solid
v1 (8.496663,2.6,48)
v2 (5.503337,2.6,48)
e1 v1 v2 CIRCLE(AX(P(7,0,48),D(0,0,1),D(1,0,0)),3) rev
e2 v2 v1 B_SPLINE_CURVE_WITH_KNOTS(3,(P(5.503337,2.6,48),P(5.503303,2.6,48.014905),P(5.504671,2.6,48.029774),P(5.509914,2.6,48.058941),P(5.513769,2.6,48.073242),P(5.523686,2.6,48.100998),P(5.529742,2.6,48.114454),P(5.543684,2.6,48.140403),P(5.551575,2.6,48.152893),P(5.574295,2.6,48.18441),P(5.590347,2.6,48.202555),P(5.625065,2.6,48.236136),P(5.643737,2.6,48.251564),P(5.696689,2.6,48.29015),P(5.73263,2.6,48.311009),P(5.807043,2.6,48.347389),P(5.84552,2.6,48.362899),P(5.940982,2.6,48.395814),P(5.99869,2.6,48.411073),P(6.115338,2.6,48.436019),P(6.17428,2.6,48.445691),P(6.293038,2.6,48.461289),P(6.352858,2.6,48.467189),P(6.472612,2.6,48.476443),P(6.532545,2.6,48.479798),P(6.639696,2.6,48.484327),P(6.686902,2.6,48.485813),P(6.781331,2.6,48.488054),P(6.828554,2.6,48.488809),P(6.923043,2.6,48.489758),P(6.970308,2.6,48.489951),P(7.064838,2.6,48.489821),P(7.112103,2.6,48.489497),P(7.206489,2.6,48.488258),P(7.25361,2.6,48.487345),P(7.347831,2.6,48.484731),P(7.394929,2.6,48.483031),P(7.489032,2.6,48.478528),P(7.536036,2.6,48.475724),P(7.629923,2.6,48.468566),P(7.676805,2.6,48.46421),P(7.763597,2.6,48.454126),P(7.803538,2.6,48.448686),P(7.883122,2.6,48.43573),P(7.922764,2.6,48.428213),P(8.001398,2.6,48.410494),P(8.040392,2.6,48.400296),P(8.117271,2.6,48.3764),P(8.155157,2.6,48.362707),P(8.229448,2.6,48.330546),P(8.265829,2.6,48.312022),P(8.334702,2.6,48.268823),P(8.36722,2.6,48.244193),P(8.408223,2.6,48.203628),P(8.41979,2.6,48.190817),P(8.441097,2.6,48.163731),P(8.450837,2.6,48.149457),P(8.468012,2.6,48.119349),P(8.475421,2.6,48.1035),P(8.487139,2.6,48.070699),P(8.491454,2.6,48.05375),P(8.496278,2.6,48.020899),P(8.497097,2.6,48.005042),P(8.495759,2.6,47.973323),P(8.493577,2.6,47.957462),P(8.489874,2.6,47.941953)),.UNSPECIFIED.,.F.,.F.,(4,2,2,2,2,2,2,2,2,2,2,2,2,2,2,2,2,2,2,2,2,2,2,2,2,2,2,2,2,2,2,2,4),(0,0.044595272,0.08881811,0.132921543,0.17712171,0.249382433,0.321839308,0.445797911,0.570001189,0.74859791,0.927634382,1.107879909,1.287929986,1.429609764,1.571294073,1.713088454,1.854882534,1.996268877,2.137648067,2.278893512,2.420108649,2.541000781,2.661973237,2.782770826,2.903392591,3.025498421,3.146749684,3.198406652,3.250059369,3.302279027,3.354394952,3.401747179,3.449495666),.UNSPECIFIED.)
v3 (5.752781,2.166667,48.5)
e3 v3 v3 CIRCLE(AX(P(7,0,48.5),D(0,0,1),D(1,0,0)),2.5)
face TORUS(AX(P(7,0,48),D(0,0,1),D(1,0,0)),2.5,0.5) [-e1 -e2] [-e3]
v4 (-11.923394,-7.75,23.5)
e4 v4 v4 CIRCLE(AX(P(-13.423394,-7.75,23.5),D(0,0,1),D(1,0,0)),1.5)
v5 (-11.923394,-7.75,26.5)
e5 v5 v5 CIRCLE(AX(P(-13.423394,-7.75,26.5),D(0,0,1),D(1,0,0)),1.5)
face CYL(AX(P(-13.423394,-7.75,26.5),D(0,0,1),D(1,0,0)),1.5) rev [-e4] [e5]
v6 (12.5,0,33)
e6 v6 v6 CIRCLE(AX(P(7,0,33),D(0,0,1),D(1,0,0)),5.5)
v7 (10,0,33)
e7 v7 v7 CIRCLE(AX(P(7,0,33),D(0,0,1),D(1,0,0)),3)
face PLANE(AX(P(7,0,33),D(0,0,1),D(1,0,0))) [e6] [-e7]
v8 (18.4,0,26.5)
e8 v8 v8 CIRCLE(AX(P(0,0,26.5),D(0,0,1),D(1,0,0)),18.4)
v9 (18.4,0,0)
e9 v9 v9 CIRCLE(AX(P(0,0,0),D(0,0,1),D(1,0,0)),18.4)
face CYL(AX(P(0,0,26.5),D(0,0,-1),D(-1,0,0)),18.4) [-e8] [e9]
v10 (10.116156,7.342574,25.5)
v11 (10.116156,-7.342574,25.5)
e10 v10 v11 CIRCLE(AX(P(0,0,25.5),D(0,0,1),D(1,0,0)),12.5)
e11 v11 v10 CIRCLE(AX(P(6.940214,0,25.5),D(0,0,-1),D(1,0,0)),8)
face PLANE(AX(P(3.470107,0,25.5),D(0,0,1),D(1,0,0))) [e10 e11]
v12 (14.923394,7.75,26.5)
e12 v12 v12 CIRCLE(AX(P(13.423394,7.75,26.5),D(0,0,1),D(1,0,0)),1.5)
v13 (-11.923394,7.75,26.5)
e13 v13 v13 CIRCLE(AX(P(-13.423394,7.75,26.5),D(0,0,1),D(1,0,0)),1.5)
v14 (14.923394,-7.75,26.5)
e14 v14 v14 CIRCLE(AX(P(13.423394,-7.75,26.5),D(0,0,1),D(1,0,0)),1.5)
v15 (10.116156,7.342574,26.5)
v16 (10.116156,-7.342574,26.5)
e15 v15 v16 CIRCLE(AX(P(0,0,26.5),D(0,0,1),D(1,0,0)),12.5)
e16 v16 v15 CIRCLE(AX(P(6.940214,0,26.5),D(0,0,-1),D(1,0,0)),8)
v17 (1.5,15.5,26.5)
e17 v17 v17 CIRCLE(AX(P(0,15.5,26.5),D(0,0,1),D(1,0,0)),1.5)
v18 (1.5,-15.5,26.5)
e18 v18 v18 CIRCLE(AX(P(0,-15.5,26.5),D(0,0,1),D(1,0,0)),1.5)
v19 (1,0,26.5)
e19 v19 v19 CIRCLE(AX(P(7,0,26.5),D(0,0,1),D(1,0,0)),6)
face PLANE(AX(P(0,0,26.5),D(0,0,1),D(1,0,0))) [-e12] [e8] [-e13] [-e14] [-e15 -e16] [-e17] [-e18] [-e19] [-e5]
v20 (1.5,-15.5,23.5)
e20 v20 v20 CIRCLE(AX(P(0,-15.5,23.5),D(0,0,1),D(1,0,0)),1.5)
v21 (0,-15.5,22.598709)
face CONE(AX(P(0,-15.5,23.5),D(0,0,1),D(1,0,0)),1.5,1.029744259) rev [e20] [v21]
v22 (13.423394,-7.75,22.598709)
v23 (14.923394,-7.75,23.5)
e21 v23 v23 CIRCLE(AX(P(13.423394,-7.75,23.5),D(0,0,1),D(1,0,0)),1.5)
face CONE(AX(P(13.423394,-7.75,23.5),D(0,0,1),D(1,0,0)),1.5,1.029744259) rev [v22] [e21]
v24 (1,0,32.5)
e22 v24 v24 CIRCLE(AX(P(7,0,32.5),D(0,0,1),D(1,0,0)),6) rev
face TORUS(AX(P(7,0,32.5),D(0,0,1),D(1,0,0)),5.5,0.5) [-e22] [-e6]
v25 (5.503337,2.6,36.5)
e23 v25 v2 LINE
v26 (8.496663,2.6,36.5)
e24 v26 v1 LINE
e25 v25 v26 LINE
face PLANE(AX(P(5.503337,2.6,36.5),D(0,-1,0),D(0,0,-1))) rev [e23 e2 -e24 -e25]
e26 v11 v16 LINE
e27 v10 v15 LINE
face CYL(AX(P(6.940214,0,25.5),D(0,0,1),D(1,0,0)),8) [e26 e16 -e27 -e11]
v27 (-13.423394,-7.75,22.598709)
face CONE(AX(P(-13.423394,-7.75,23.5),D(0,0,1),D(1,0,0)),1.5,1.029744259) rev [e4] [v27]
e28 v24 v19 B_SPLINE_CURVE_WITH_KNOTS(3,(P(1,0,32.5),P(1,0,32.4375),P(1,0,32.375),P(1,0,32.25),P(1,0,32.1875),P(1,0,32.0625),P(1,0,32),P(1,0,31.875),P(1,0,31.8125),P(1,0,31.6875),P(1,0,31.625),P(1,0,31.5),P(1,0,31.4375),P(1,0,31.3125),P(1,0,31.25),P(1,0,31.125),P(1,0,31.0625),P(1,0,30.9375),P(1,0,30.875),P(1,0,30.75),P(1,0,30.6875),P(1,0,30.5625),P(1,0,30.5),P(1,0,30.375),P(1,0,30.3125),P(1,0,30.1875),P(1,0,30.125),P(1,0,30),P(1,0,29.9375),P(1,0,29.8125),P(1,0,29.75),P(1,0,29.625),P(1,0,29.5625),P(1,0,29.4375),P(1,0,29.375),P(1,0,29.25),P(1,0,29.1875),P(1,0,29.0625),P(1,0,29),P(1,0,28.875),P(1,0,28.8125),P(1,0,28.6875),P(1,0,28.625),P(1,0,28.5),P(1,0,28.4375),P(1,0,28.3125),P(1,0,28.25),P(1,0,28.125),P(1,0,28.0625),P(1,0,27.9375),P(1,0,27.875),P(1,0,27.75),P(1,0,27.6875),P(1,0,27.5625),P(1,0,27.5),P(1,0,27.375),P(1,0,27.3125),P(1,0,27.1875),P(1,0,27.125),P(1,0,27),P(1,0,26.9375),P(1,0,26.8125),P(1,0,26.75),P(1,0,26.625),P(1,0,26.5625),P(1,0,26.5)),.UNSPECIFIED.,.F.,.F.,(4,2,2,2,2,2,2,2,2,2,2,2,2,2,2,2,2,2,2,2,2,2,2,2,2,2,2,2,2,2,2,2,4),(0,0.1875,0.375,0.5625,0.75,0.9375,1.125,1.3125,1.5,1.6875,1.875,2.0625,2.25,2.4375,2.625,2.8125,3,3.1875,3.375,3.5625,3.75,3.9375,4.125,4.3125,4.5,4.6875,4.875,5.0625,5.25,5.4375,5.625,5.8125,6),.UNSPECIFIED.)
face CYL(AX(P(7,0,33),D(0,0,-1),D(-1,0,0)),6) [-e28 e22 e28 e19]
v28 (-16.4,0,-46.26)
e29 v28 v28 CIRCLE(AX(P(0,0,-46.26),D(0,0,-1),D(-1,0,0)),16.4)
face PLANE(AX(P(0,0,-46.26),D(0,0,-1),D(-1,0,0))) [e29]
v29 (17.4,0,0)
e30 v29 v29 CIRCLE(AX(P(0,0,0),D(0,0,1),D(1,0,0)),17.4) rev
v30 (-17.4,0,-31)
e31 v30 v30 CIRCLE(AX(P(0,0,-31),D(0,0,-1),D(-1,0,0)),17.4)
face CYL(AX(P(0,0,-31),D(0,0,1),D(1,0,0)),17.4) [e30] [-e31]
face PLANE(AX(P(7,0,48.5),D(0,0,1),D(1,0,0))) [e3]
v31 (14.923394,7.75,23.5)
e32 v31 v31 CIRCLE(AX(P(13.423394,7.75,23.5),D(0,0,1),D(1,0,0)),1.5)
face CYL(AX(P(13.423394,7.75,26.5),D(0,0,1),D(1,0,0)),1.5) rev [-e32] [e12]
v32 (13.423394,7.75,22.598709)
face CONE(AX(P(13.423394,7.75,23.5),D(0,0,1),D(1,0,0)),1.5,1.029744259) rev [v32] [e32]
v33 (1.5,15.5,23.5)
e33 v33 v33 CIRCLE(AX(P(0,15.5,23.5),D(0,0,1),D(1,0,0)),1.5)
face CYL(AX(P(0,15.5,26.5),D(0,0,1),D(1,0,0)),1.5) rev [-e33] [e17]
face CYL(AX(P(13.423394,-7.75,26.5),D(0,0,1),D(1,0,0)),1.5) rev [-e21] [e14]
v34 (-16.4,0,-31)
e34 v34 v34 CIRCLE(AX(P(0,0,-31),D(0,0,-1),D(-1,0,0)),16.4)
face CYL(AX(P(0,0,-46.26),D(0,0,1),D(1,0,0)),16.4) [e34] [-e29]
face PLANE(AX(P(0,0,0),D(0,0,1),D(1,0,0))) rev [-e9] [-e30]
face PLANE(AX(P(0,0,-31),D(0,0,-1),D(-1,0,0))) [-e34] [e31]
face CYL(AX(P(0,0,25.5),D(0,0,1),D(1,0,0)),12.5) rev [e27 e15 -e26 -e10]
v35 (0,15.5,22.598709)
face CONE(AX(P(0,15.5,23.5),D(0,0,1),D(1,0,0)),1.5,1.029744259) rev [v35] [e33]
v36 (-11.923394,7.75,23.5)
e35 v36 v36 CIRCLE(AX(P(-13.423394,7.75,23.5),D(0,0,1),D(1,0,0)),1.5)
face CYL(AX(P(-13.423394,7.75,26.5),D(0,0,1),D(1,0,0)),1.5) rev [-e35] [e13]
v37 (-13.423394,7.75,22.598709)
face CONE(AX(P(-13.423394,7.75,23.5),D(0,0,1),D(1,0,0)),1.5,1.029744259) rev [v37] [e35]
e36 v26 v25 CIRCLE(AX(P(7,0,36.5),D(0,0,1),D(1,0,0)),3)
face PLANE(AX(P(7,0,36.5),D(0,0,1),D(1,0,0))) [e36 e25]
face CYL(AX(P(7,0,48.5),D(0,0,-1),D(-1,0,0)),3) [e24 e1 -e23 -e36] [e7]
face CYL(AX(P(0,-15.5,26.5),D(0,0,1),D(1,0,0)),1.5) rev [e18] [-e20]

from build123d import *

# Parameters (mm, degrees)
SKETCH1_R                    = 18.4
BOSS_EXTRUDE1_DEPTH          = 26.5
SKETCH2_R                    = 17.4
BOSS_EXTRUDE2_DEPTH          = 31
SKETCH3_R                    = 6
BOSS_EXTRUDE3_DEPTH          = 6.5
FILLET1_R                    = 0.5
SKETCH4_R                    = 3
BOSS_EXTRUDE4_DEPTH          = 15.5
CUT_EXTRUDE1_START           = -12
CUT_EXTRUDE1_DEPTH           = 12
F_3_0_3_DIAMETER_HOLE1_D     = 3
F_3_0_3_DIAMETER_HOLE1_DEPTH = 3
F_3_0_3_DIAMETER_HOLE1_TIP   = 0.901290929
CUT_EXTRUDE2_DEPTH           = 1
SKETCH9_R                    = 4
BOSS_EXTRUDE5_DEPTH          = 1
FILLET2_R                    = 0.5
SKETCH10_R                   = 14
BOSS_EXTRUDE6_DEPTH          = 1.5
SKETCH11_W                   = 3.5
SKETCH11_H                   = 1
BOSS_EXTRUDE7_DEPTH          = 5.6
FILLET3_R                    = 0.5
SKETCH13_R                   = 9
BOSS_EXTRUDE8_DEPTH          = 3
SKETCH14_R                   = 1.5
BOSS_EXTRUDE9_DEPTH          = 8.55
FILLET4_R                    = 0.5
SKETCH15_R                   = 16.4
BOSS_EXTRUDE10_DEPTH         = 15.26


with BuildPart() as part:
    # Sketch1 → Boss-Extrude1 (new body)
    with BuildSketch(Plane.XY):
        Circle(SKETCH1_R)
    extrude(amount=BOSS_EXTRUDE1_DEPTH)

    # Sketch2 → Boss-Extrude2 (add)
    with BuildSketch(Plane(origin=(0, 0, 0), x_dir=(-1, 0, 0), z_dir=(0, 0, -1))):
        with Locations(Location((0, 0, 0), (0, 0, 180))):
            Circle(SKETCH2_R)
    extrude(amount=BOSS_EXTRUDE2_DEPTH)

    # Sketch3 → Boss-Extrude3 (add)
    with BuildSketch(Plane.XY.offset(26.5)):
        with Locations(Location((7, 0, 0), (0, 0, 180))):
            Circle(SKETCH3_R)
    extrude(amount=BOSS_EXTRUDE3_DEPTH)

    # Fillet1
    fillet1_edges = [part.edges().sort_by_distance(p)[0] for p in [
        (13, 0, 33),
    ]]
    fillet(fillet1_edges, radius=FILLET1_R)

    # Sketch4 → Boss-Extrude4 (add)
    with BuildSketch(Plane.XY.offset(33)):
        with Locations((7, 0)):
            Circle(SKETCH4_R)
    extrude(amount=BOSS_EXTRUDE4_DEPTH)

    # Sketch5 → Cut-Extrude1 (cut)
    with BuildSketch(Plane.XY.offset(48.5).offset(CUT_EXTRUDE1_START)):
        with BuildLine():
            Line((5.503337045, 2.6), (8.496662955, 2.6))
            ThreePointArc((8.496662955, 2.6), (7, 3), (5.503337045, 2.6))
        make_face()
    extrude(amount=CUT_EXTRUDE1_DEPTH, mode=Mode.SUBTRACT)

    # Ø3.0 (3) Diameter Hole1
    with Locations(Plane.XY.offset(26.5)):
        with Locations((-13.423393759, 7.75), (-13.423393759, -7.75), (0, -15.5), (13.423393759, 7.75), (0, 15.5), (13.423393759, -7.75)):
            Hole(F_3_0_3_DIAMETER_HOLE1_D / 2, depth=F_3_0_3_DIAMETER_HOLE1_DEPTH)
            with Locations((0, 0, -(F_3_0_3_DIAMETER_HOLE1_DEPTH + F_3_0_3_DIAMETER_HOLE1_TIP / 2))):  # 118° drill point
                Cone(0, F_3_0_3_DIAMETER_HOLE1_D / 2, F_3_0_3_DIAMETER_HOLE1_TIP, mode=Mode.SUBTRACT)

    # Sketch8 → Cut-Extrude2 (cut)
    with BuildSketch(Plane.XY.offset(26.5)):
        with BuildLine():
            ThreePointArc((10.116155685, 7.342574083), (-12.5, 0), (10.116155685, -7.342574083))
            ThreePointArc((10.116155685, -7.342574083), (-1.05978604, 0), (10.116155685, 7.342574083))
        make_face()
    extrude(amount=-CUT_EXTRUDE2_DEPTH, mode=Mode.SUBTRACT)

    # Sketch9 → Boss-Extrude5 (add)
    with BuildSketch(Plane(origin=(0, 0, -31), x_dir=(-1, 0, 0), z_dir=(0, 0, -1))):
        Circle(SKETCH9_R)
    extrude(amount=BOSS_EXTRUDE5_DEPTH)

    # Fillet2
    fillet2_edges = [part.edges().sort_by_distance(p)[0] for p in [
        (4, 0, -32),
    ]]
    fillet(fillet2_edges, radius=FILLET2_R)

    # Sketch11 → Boss-Extrude7 (add)
    with BuildSketch(Plane(origin=(0, 0, -31), x_dir=(-1, 0, 0), z_dir=(0, 0, -1))):
        with Locations((0, 12.05)):
            Rectangle(SKETCH11_W, SKETCH11_H)
        with Locations((0, -12.05)):
            Rectangle(SKETCH11_W, SKETCH11_H)
    extrude(amount=BOSS_EXTRUDE7_DEPTH)

    # Fillet3
    fillet3_edges = [part.edges().sort_by_distance(p)[0] for p in [
        (1.75, 12.05, -36.6),
        (-1.75, 12.05, -36.6),
        (-1.75, -12.05, -36.6),
        (1.75, -12.05, -36.6),
    ]]
    fillet(fillet3_edges, radius=FILLET3_R)

    # Sketch14 → Boss-Extrude9 (add)
    with BuildSketch(Plane(origin=(0, 0, -32), x_dir=(-1, 0, 0), z_dir=(0, 0, -1))):
        Circle(SKETCH14_R)
    extrude(amount=BOSS_EXTRUDE9_DEPTH)

    # Fillet4
    # the kernel refuses this fillet: 0.5 mm, written as the material it takes off along each edge
    with BuildSketch(Plane(origin=(7, 0, 48.5), x_dir=(0.4622655728594592, 0.8867415295050277, 0), z_dir=(0.8867415295050277, -0.4622655728594592, 0))) as fillet4_piece_1:
        with BuildLine():
            CenterArc((3 - FILLET4_R, -FILLET4_R), FILLET4_R, 0, 90)
            Line((3 - FILLET4_R, 0), (3 - FILLET4_R, FILLET4_R * 0.02))
            Line((3 - FILLET4_R, FILLET4_R * 0.02), (3 + FILLET4_R * 0.02, FILLET4_R * 0.02))
            Line((3 + FILLET4_R * 0.02, FILLET4_R * 0.02), (3 + FILLET4_R * 0.02, -FILLET4_R))
            Line((3 + FILLET4_R * 0.02, -FILLET4_R), (3, -FILLET4_R))
        make_face()
    revolve(axis=Axis((7, 0, 48.5), (0, 0, 1)), revolution_arc=297.533397677, mode=Mode.SUBTRACT)
    with BuildSketch(Plane(origin=(7, 0, 48.5), x_dir=(1, 0, 0), z_dir=(0, -1, 0))) as fillet4_piece_2:
        with BuildLine():
            CenterArc((3 - FILLET4_R, -FILLET4_R), FILLET4_R, 0, 90)
            Line((3 - FILLET4_R, 0), (3 - FILLET4_R, FILLET4_R * 0.02))
            Line((3 - FILLET4_R, FILLET4_R * 0.02), (3 + FILLET4_R * 0.02, FILLET4_R * 0.02))
            Line((3 + FILLET4_R * 0.02, FILLET4_R * 0.02), (3 + FILLET4_R * 0.02, -FILLET4_R))
            Line((3 + FILLET4_R * 0.02, -FILLET4_R), (3, -FILLET4_R))
        make_face()
    revolve(axis=Axis((7, 0, 48.5), (0, 0, 1)), revolution_arc=117.379597562, mode=Mode.SUBTRACT)



with BuildPart() as body_2:
    # Sketch10 → Boss-Extrude6 (new body)
    with BuildSketch(Plane(origin=(0, 0, -34), x_dir=(-1, 0, 0), z_dir=(0, 0, -1))):
        Circle(SKETCH10_R)
    extrude(amount=BOSS_EXTRUDE6_DEPTH)


with BuildPart() as body_3:
    # Sketch13 → Boss-Extrude8 (new body)
    with BuildSketch(Plane(origin=(0, 0, -37.5), x_dir=(-1, 0, 0), z_dir=(0, 0, -1))):
        Circle(SKETCH13_R)
    extrude(amount=BOSS_EXTRUDE8_DEPTH)


with BuildPart() as part_1:
    add(part.part)

    add(body_2.part)  # Boss-Extrude10 merges body 2

    add(body_3.part)  # Boss-Extrude10 merges body 3
    # Sketch15 → Boss-Extrude10 (add)
    with BuildSketch(Plane(origin=(0, 0, -31), x_dir=(-1, 0, 0), z_dir=(0, 0, -1))):
        Circle(SKETCH15_R)
    extrude(amount=BOSS_EXTRUDE10_DEPTH)


solid = part_1.part
